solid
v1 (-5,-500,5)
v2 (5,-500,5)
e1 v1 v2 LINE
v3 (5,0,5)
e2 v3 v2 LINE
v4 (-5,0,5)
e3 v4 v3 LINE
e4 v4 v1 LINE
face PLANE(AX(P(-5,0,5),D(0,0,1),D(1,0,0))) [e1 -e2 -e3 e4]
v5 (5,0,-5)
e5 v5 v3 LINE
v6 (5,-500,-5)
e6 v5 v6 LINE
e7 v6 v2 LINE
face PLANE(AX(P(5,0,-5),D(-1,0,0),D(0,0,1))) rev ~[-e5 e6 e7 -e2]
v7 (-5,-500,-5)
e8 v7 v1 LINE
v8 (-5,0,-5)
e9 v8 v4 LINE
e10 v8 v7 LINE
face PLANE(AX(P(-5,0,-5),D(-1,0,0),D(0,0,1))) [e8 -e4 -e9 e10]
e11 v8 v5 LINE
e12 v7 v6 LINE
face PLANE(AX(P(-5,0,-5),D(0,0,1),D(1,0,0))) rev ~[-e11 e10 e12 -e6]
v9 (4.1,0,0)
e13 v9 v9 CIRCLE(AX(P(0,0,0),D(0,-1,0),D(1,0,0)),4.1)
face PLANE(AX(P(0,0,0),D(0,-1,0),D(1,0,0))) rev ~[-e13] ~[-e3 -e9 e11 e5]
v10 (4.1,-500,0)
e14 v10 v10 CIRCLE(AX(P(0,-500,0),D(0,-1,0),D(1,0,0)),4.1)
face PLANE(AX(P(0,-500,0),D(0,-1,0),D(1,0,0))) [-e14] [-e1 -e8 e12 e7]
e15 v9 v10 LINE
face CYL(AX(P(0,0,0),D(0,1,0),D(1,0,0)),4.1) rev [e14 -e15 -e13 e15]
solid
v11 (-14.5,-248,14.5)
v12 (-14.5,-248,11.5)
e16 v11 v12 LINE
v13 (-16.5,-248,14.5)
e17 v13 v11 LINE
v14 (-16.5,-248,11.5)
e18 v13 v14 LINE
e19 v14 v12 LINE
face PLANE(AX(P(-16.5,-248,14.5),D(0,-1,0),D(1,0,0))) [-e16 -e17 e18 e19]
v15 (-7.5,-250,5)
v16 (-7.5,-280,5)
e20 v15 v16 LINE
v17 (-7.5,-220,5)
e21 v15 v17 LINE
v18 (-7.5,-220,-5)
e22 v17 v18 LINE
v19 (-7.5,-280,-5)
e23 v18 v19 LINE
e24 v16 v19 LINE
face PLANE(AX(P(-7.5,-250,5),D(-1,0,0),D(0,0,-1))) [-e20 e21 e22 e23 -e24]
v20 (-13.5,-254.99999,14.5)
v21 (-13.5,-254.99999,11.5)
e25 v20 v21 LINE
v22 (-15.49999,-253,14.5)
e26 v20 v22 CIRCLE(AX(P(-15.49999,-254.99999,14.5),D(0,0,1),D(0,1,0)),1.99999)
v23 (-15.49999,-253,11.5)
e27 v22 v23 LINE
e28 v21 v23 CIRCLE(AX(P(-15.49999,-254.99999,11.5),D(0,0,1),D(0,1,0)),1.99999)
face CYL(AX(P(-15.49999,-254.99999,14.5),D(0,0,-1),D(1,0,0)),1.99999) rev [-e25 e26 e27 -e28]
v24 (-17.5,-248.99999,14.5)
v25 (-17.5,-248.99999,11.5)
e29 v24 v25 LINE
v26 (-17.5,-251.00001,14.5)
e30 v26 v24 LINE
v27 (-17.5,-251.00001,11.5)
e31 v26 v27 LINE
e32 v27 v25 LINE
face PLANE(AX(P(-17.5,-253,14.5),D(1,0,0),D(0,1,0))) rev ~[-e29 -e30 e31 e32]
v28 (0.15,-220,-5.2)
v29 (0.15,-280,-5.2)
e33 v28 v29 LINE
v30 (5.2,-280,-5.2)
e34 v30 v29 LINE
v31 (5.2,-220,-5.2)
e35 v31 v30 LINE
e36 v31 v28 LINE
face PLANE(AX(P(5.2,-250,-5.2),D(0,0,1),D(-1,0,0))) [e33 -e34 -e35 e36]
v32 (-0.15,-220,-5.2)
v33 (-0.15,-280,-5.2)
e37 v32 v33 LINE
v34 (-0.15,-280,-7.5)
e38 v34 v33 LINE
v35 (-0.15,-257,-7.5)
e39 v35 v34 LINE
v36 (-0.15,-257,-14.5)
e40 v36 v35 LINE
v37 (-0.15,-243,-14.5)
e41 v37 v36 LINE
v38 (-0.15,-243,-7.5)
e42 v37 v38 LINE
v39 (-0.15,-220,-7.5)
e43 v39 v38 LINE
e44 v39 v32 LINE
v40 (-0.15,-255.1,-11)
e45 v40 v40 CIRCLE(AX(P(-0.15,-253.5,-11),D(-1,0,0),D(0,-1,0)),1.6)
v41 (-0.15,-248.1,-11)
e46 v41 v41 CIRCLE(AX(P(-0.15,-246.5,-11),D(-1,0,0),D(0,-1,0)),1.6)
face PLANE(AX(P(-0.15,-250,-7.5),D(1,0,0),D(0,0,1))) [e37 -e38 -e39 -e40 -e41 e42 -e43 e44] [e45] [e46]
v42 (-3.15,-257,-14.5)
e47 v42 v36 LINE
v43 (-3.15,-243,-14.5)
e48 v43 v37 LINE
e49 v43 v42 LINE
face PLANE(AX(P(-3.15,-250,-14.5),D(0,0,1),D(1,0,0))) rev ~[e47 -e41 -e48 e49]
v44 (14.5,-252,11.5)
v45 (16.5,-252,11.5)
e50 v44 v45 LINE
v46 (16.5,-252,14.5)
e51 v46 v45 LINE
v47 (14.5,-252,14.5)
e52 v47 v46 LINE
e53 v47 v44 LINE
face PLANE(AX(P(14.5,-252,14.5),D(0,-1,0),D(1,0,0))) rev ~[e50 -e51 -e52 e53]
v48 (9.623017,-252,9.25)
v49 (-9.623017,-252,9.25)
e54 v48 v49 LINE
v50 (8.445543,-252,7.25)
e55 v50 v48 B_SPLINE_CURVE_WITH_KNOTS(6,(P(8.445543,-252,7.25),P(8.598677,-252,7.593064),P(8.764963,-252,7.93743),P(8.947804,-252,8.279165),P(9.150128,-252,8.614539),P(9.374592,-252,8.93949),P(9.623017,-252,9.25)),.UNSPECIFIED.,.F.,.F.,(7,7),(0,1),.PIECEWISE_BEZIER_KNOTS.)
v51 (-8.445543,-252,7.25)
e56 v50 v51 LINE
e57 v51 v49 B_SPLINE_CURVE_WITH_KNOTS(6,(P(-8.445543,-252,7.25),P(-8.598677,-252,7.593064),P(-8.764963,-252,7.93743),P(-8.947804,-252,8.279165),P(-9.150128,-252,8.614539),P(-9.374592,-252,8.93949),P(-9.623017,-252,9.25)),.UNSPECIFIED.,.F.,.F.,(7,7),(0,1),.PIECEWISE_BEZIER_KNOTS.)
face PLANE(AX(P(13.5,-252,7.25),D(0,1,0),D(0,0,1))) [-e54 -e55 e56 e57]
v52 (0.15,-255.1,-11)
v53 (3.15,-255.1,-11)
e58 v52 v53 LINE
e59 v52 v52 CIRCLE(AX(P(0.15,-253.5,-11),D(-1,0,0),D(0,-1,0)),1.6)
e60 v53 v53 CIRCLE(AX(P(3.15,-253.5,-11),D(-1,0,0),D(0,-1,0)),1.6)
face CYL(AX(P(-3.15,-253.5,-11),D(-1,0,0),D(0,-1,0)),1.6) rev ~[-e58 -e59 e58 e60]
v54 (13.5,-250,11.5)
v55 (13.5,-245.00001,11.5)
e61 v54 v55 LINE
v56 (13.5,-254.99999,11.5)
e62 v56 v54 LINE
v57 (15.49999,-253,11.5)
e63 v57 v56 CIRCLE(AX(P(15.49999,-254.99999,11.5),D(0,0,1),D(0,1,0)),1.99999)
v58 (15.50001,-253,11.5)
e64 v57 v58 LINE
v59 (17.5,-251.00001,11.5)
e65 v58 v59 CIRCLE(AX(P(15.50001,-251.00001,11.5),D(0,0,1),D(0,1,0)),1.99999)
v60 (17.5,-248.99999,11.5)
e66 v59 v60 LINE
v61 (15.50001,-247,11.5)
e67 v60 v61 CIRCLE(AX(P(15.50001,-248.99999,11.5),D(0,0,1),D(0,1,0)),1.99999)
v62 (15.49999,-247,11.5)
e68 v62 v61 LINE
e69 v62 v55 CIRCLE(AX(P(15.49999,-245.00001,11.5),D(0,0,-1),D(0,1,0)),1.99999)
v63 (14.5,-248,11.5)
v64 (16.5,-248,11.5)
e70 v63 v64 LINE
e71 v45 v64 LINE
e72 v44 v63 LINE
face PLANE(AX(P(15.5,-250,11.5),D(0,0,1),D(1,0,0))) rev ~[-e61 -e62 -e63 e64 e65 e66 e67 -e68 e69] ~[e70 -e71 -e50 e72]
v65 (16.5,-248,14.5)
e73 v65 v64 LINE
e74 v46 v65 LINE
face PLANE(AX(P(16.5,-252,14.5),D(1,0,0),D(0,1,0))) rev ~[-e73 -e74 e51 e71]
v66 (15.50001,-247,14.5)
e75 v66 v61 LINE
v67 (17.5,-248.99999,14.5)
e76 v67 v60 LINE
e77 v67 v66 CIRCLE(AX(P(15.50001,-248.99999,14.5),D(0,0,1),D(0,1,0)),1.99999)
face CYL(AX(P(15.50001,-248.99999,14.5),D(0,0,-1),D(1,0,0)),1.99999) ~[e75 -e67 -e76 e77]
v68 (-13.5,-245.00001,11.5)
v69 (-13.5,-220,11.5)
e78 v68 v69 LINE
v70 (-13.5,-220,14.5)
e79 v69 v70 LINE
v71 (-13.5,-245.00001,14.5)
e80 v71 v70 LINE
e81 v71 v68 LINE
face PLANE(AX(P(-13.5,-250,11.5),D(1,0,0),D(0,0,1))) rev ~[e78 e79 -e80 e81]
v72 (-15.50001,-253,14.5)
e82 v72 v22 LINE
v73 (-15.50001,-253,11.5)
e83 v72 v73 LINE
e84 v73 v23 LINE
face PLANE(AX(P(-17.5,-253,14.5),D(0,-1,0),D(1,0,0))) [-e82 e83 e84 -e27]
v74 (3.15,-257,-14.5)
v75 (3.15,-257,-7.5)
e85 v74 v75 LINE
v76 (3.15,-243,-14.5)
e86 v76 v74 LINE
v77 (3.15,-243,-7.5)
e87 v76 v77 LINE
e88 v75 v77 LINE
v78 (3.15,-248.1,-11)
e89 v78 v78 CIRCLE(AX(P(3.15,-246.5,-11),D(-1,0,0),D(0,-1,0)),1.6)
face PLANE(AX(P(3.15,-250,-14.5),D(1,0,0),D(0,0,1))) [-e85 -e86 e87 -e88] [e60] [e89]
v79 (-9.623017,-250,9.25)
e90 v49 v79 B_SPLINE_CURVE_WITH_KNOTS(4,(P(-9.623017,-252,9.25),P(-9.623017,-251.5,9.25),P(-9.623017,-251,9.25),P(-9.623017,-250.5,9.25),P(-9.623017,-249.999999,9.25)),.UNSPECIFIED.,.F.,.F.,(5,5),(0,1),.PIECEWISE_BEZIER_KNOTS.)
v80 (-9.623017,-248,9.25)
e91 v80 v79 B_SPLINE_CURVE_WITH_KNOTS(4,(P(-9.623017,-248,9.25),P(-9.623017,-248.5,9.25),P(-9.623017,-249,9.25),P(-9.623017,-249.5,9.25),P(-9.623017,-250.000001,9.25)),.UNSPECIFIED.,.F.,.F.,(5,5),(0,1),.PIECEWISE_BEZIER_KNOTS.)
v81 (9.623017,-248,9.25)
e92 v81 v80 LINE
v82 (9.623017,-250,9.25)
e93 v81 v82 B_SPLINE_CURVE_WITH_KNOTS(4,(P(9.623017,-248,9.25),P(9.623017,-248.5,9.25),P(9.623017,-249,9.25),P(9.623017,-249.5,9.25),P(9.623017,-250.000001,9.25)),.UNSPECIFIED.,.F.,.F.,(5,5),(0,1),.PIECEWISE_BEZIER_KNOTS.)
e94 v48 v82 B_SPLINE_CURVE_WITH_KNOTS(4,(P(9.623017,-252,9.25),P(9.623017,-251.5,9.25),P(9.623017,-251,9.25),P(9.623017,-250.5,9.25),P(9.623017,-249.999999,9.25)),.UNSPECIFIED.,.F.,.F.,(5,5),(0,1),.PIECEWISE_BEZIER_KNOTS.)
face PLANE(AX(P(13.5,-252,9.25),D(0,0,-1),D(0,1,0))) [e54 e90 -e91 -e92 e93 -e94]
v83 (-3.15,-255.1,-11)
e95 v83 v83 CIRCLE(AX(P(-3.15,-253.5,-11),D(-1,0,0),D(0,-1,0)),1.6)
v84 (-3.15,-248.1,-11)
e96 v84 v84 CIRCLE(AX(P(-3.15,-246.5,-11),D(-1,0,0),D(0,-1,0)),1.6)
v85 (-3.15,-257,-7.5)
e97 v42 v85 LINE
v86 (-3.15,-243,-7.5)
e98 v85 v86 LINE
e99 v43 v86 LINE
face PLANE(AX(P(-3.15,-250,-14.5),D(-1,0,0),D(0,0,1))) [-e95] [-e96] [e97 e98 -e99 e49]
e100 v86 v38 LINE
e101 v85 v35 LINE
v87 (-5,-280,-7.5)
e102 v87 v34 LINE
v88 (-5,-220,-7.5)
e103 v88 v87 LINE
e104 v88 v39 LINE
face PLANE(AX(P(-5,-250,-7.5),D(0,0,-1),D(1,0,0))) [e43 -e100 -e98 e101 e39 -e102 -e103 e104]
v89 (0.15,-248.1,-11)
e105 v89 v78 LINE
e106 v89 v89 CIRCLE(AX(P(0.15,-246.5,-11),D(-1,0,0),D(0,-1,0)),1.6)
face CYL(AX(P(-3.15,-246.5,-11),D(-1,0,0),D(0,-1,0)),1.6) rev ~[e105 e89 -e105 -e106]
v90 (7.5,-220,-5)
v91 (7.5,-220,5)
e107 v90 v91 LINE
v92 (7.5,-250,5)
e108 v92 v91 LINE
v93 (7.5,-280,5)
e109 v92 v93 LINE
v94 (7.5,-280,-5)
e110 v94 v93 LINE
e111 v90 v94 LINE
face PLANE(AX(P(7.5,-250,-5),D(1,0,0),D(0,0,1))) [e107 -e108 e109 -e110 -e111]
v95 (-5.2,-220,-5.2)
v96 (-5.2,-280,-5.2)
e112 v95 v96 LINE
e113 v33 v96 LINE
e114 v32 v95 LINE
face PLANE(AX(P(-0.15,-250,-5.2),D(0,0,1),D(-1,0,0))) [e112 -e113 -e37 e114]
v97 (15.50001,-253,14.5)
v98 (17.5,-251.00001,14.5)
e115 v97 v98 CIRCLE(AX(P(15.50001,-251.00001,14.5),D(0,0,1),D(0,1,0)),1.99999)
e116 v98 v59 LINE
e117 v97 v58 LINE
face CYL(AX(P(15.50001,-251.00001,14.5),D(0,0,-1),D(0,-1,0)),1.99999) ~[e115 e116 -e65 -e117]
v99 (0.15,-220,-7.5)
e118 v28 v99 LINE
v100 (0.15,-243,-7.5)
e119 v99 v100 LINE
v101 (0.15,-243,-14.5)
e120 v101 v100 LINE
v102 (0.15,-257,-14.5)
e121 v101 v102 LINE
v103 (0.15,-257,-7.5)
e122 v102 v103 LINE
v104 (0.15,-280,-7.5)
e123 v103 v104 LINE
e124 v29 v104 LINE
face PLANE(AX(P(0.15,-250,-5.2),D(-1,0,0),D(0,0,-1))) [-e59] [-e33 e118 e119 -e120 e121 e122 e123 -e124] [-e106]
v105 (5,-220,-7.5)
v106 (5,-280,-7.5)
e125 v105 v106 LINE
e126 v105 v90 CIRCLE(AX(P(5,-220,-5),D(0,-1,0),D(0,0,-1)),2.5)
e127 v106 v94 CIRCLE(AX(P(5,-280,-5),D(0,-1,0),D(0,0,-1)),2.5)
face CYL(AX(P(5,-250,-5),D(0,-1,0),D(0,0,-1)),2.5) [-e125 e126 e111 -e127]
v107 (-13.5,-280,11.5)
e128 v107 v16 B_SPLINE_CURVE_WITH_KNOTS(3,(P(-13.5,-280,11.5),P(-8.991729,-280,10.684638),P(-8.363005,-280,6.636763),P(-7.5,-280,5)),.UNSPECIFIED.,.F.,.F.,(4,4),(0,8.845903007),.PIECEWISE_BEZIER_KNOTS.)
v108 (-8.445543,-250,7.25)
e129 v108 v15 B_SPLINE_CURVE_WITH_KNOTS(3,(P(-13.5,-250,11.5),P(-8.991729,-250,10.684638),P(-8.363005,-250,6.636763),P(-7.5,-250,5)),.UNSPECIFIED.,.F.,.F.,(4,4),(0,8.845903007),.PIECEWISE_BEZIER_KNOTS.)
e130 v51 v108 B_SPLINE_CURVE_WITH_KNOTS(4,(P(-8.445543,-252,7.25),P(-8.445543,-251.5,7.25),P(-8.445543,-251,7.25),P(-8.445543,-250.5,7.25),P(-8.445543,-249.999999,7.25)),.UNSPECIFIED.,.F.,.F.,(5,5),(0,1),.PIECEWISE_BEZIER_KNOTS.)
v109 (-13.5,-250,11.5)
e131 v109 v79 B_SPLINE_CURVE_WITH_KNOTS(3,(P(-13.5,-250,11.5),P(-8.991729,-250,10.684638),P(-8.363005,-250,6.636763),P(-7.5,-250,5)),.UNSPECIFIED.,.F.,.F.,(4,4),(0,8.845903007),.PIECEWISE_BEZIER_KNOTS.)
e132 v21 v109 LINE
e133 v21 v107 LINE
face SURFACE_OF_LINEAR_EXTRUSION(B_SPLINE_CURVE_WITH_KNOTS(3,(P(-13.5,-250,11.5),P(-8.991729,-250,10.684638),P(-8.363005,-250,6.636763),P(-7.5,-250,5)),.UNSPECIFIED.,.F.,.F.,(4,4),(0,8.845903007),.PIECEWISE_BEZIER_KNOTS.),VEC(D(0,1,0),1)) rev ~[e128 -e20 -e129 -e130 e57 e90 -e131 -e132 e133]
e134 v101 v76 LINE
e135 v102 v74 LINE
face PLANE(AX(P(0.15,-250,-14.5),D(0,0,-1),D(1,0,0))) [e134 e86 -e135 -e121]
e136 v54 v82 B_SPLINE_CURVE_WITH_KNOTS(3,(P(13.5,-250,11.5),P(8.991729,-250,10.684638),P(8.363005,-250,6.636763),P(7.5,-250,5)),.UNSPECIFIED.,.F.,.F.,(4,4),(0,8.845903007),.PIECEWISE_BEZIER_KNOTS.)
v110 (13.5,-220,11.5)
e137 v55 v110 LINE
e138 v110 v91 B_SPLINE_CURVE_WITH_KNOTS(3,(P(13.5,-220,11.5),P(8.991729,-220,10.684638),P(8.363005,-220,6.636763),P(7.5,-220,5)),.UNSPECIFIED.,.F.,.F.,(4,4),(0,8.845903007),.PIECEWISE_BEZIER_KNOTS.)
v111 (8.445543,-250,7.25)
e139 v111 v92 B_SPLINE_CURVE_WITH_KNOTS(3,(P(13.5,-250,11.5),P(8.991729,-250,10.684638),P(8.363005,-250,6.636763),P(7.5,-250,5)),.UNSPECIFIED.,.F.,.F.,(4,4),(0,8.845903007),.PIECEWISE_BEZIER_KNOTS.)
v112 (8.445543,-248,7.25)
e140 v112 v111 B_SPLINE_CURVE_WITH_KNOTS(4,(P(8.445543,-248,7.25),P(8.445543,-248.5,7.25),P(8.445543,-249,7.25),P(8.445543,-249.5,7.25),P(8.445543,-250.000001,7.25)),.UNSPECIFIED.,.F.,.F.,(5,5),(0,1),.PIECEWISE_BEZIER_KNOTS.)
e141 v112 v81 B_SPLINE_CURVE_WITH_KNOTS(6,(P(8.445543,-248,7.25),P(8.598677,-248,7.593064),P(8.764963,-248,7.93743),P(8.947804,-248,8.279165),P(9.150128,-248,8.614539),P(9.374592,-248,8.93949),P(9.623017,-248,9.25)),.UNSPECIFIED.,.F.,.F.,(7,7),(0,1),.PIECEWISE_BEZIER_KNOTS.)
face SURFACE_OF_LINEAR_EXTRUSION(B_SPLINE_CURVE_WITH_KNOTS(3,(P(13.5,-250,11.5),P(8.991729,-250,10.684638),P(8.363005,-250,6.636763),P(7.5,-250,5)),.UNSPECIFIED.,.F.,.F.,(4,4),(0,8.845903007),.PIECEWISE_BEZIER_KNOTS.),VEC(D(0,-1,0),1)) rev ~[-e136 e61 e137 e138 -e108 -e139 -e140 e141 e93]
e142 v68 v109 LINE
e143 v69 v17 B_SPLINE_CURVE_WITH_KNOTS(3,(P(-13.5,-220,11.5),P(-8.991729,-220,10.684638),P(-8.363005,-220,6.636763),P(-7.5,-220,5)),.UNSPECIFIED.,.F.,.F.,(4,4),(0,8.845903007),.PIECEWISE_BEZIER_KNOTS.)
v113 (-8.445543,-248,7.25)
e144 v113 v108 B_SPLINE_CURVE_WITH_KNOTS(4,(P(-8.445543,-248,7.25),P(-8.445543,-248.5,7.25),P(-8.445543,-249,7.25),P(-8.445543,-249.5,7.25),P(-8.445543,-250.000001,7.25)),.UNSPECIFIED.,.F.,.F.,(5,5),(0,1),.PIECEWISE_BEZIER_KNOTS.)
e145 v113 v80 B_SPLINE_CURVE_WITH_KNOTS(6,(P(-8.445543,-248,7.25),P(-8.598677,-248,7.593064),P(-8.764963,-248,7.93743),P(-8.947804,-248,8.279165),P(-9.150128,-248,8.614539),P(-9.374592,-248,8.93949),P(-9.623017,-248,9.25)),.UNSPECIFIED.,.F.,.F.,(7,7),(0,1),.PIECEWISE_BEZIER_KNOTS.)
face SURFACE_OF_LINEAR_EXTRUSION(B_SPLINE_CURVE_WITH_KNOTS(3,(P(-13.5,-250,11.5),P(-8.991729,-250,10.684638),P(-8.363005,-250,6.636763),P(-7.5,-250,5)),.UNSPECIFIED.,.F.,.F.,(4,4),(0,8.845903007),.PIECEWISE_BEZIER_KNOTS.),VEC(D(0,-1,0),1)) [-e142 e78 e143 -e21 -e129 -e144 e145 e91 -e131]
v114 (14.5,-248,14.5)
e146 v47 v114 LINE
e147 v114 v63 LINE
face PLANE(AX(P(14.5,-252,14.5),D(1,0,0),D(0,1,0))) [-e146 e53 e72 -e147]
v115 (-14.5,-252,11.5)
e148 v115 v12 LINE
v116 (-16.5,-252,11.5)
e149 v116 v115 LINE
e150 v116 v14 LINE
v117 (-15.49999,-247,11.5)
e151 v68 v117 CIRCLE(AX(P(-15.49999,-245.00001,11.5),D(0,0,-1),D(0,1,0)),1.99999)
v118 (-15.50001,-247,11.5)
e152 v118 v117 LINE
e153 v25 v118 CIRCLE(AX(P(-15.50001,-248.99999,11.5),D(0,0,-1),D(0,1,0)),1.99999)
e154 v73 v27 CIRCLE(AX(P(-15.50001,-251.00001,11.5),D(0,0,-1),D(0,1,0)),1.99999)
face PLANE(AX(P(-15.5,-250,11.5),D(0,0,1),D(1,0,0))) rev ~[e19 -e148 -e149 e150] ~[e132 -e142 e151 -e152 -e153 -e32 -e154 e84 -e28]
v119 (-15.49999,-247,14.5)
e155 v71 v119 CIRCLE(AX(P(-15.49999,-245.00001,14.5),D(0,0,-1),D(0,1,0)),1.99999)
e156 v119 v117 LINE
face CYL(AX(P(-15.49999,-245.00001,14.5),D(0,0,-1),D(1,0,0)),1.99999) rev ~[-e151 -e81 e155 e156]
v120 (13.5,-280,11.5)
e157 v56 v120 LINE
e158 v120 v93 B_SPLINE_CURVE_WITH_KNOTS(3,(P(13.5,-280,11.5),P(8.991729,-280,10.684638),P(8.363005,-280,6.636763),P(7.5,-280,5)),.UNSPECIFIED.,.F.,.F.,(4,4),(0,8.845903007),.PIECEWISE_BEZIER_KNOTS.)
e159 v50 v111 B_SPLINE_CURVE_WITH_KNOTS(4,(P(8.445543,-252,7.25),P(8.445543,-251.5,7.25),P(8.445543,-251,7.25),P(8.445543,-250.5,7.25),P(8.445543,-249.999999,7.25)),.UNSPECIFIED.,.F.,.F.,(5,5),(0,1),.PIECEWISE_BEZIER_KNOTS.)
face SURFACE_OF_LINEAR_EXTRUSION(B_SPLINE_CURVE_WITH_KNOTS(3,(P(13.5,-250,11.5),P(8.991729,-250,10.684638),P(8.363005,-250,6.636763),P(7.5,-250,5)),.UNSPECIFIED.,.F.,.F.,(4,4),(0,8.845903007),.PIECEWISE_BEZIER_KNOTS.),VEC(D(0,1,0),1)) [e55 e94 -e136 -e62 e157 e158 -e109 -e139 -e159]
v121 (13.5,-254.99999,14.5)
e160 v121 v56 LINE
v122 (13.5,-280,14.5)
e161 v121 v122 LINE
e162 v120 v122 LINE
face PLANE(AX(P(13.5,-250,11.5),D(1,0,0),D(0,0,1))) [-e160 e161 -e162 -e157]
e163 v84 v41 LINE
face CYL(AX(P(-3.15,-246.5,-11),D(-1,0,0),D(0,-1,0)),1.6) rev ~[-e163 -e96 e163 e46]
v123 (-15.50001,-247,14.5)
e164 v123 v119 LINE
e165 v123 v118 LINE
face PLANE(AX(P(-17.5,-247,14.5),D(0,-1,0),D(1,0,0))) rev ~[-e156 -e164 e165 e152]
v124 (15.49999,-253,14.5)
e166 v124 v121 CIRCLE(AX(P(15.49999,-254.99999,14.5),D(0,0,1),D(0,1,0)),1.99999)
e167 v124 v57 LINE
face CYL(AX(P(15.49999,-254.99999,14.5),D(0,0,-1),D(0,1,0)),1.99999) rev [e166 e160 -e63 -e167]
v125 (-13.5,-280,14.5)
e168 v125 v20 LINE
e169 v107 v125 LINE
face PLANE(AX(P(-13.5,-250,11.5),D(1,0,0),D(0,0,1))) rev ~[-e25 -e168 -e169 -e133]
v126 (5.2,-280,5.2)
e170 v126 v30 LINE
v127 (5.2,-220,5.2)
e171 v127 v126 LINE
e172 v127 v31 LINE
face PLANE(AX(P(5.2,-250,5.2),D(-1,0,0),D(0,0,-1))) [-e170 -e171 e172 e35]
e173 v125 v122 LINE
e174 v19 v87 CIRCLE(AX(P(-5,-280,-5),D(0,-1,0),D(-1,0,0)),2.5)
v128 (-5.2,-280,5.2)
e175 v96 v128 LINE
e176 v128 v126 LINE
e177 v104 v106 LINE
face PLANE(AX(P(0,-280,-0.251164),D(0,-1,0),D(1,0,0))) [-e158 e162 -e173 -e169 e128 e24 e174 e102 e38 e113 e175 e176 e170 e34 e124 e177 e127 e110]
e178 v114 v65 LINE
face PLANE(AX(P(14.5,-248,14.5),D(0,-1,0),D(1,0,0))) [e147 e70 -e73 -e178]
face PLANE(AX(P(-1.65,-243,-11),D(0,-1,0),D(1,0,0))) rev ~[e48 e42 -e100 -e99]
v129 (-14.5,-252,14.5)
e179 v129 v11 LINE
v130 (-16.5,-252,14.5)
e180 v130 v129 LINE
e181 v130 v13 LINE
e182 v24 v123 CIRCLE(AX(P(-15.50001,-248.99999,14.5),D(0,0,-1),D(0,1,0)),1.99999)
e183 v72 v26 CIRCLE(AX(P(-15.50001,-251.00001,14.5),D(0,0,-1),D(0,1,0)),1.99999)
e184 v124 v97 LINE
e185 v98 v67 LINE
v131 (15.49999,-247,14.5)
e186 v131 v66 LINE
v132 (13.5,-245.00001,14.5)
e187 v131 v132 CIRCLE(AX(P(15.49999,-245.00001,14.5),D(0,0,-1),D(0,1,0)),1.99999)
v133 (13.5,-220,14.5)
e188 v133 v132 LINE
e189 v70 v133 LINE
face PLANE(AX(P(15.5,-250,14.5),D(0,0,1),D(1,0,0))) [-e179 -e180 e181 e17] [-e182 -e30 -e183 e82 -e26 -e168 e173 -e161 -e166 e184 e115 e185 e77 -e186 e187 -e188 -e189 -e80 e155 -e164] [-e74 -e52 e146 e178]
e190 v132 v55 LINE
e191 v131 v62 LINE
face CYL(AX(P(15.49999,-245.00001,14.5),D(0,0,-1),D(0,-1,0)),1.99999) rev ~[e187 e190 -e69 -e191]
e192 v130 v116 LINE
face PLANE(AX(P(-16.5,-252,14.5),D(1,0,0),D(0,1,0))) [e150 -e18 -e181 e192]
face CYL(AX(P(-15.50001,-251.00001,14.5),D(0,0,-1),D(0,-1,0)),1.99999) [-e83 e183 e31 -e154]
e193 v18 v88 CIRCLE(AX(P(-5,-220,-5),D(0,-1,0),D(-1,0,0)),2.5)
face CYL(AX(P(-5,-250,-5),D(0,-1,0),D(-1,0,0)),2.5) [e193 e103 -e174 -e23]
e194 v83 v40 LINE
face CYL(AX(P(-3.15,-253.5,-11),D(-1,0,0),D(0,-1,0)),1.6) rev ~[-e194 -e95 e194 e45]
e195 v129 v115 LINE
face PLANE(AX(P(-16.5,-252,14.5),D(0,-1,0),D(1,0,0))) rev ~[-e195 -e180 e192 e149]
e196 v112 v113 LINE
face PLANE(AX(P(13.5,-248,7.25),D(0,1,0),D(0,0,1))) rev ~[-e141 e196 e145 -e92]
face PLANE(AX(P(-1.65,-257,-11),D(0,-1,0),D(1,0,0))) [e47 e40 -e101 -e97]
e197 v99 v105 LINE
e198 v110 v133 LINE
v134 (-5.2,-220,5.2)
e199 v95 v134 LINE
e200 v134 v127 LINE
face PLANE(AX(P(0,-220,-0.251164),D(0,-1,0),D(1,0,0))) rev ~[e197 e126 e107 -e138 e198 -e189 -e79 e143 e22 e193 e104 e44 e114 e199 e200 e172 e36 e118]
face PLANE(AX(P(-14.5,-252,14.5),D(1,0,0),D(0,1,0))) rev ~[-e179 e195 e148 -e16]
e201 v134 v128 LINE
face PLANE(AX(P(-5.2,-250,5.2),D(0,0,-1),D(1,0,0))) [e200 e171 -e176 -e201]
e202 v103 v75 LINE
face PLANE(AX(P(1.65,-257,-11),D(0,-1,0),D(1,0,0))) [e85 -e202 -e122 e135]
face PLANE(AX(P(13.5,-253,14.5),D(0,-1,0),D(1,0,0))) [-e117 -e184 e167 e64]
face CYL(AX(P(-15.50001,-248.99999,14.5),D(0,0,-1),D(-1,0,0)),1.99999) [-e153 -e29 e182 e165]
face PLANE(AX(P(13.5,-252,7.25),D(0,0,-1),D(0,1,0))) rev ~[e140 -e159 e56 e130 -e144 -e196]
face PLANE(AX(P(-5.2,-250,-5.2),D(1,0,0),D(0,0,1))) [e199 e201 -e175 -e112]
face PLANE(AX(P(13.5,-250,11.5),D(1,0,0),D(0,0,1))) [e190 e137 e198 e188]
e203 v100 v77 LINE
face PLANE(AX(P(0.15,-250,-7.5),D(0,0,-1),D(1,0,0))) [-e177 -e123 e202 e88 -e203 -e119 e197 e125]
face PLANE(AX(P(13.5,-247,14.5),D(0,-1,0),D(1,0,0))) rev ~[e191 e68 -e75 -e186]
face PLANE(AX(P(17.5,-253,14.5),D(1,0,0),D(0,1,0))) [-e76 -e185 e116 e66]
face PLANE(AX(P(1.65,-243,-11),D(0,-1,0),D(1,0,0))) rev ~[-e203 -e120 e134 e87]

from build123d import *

# Parameters (mm, degrees)
F0_W      = 10
F0_H      = 10
F0_R      = 4.1
F1_DEPTH  = 500
F3_W      = 27
F3_H      = 3
F4_DEPTH  = 30
F3_W_2    = 3
F3_H_2    = 7
F5_DEPTH  = 7
F6_R      = 1.6
F7_DEPTH  = 25
F8_W      = 4
F8_H      = 6
F8_W_2    = 2
F8_H_2    = 4
F9_DEPTH  = 3
F10_R     = 1.99999
F11_W     = 4
F11_H     = 2
F12_DEPTH = 25


# Not quite as in the source:
# - a fillet or chamfer is up to 0.001 mm smaller than in the source, because OpenCascade refuses the exact size


with BuildPart() as f1:
    # F0 (on Front) → F1 (new body)
    with BuildSketch(Plane.XZ):
        Rectangle(F0_W, F0_H)
        Circle(F0_R, mode=Mode.SUBTRACT)
    extrude(amount=F1_DEPTH)


with BuildPart() as f4:
    # F3 (on offset) → F4 (new body, symmetric)
    with BuildSketch(Plane.XZ.offset(250)):
        with BuildLine():
            Line((5, 7.5), (-5, 7.5))
            ThreePointArc((-5, 7.5), (-6.767766953, 6.767766953), (-7.5, 5))
            Line((-7.5, 5), (-7.5, -5))
            ThreePointArc((-7.5, -5), (-6.767766953, -6.767766953), (-5, -7.5))
            Line((-5, -7.5), (-3.15, -7.5))
            Line((-3.15, -7.5), (-0.15, -7.5))
            Line((-0.15, -7.5), (-0.15, -5.2))
            Line((-0.15, -5.2), (-5.2, -5.2))
            Line((-5.2, -5.2), (-5.2, 5.2))
            Line((-5.2, 5.2), (5.2, 5.2))
            Line((5.2, 5.2), (5.2, -5.2))
            Line((5.2, -5.2), (0.15, -5.2))
            Line((0.15, -5.2), (0.15, -7.5))
            Line((0.15, -7.5), (3.15, -7.5))
            Line((3.15, -7.5), (5, -7.5))
            ThreePointArc((5, -7.5), (6.767766953, -6.767766953), (7.5, -5))
            Line((7.5, -5), (7.5, 5))
            ThreePointArc((7.5, 5), (6.767766953, 6.767766953), (5, 7.5))
        make_face()
        with Locations((0, 13)):
            Rectangle(F3_W, F3_H)
        with BuildLine():
            ThreePointArc((-7.5, 5), (-6.767766953, 6.767766953), (-5, 7.5))
            Line((-5, 7.5), (5, 7.5))
            ThreePointArc((5, 7.5), (6.767766953, 6.767766953), (7.5, 5))
            add(Edge.make_bspline(
                [(13.5, 11.5), (8.9917294681, 10.6846382581), (8.3630047739, 6.6367634572), (7.5, 5)],
                knots=[0, 0, 0, 0, 8.8459030065, 8.8459030065, 8.8459030065, 8.8459030065], degree=3))
            Line((13.5, 11.5), (-13.5, 11.5))
            add(Edge.make_bspline(
                [(-13.5, 11.5), (-8.9917294681, 10.6846382581), (-8.3630047739, 6.6367634572), (-7.5, 5)],
                knots=[0, 0, 0, 0, 8.8459030065, 8.8459030065, 8.8459030065, 8.8459030065], degree=3))
        make_face()
    extrude(amount=F4_DEPTH, both=True)

    # F3 (on offset) → F5 (join, symmetric)
    with BuildSketch(Plane.XZ.offset(250)):
        with Locations((-1.65, -11)):
            Rectangle(F3_W_2, F3_H_2)
        with Locations((1.65, -11)):
            Rectangle(F3_W_2, F3_H_2)
    extrude(amount=F5_DEPTH, both=True)

    # F6 (on face) → F7 (cut)
    with BuildSketch(Plane(origin=(-3.15, 0, 0), x_dir=(0, -1, 0), z_dir=(-1, 0, 0))):
        with Locations((246.5, -11)):
            Circle(F6_R)
        with Locations((253.5, -11)):
            Circle(F6_R)
    extrude(amount=-F7_DEPTH, mode=Mode.SUBTRACT)

    # F8 (on face) → F9 (join)
    with BuildSketch(Plane.XY.offset(14.5)):
        with Locations((15.5, -250)):
            Rectangle(F8_W, F8_H)
        with Locations((15.5, -250)):
            Rectangle(F8_W_2, F8_H_2, mode=Mode.SUBTRACT)
        with Locations((-15.5, -250)):
            Rectangle(F8_W, F8_H)
        with Locations((-15.5, -250)):
            Rectangle(F8_W_2, F8_H_2, mode=Mode.SUBTRACT)
    extrude(amount=-F9_DEPTH)

    # F10 (radius 2 in the source; OpenCascade refuses exactly that, so slightly less here)
    f10_edges = [f4.edges().sort_by_distance(p)[0] for p in [
        (-17.5, -247, 13),
        (-13.5, -247, 13),
        (-17.5, -253, 13),
        (-13.5, -253, 13),
        (17.5, -247, 13),
        (13.5, -247, 13),
        (13.5, -253, 13),
        (17.5, -253, 13),
    ]]
    fillet(f10_edges, radius=F10_R)

    # F11 (on face) → F12 (cut)
    with BuildSketch(Plane.YZ.offset(13.5)):
        with Locations((-250, 8.25)):
            Rectangle(F11_W, F11_H)
    extrude(amount=-F12_DEPTH, mode=Mode.SUBTRACT)


solid = Compound([f1.part, f4.part])
